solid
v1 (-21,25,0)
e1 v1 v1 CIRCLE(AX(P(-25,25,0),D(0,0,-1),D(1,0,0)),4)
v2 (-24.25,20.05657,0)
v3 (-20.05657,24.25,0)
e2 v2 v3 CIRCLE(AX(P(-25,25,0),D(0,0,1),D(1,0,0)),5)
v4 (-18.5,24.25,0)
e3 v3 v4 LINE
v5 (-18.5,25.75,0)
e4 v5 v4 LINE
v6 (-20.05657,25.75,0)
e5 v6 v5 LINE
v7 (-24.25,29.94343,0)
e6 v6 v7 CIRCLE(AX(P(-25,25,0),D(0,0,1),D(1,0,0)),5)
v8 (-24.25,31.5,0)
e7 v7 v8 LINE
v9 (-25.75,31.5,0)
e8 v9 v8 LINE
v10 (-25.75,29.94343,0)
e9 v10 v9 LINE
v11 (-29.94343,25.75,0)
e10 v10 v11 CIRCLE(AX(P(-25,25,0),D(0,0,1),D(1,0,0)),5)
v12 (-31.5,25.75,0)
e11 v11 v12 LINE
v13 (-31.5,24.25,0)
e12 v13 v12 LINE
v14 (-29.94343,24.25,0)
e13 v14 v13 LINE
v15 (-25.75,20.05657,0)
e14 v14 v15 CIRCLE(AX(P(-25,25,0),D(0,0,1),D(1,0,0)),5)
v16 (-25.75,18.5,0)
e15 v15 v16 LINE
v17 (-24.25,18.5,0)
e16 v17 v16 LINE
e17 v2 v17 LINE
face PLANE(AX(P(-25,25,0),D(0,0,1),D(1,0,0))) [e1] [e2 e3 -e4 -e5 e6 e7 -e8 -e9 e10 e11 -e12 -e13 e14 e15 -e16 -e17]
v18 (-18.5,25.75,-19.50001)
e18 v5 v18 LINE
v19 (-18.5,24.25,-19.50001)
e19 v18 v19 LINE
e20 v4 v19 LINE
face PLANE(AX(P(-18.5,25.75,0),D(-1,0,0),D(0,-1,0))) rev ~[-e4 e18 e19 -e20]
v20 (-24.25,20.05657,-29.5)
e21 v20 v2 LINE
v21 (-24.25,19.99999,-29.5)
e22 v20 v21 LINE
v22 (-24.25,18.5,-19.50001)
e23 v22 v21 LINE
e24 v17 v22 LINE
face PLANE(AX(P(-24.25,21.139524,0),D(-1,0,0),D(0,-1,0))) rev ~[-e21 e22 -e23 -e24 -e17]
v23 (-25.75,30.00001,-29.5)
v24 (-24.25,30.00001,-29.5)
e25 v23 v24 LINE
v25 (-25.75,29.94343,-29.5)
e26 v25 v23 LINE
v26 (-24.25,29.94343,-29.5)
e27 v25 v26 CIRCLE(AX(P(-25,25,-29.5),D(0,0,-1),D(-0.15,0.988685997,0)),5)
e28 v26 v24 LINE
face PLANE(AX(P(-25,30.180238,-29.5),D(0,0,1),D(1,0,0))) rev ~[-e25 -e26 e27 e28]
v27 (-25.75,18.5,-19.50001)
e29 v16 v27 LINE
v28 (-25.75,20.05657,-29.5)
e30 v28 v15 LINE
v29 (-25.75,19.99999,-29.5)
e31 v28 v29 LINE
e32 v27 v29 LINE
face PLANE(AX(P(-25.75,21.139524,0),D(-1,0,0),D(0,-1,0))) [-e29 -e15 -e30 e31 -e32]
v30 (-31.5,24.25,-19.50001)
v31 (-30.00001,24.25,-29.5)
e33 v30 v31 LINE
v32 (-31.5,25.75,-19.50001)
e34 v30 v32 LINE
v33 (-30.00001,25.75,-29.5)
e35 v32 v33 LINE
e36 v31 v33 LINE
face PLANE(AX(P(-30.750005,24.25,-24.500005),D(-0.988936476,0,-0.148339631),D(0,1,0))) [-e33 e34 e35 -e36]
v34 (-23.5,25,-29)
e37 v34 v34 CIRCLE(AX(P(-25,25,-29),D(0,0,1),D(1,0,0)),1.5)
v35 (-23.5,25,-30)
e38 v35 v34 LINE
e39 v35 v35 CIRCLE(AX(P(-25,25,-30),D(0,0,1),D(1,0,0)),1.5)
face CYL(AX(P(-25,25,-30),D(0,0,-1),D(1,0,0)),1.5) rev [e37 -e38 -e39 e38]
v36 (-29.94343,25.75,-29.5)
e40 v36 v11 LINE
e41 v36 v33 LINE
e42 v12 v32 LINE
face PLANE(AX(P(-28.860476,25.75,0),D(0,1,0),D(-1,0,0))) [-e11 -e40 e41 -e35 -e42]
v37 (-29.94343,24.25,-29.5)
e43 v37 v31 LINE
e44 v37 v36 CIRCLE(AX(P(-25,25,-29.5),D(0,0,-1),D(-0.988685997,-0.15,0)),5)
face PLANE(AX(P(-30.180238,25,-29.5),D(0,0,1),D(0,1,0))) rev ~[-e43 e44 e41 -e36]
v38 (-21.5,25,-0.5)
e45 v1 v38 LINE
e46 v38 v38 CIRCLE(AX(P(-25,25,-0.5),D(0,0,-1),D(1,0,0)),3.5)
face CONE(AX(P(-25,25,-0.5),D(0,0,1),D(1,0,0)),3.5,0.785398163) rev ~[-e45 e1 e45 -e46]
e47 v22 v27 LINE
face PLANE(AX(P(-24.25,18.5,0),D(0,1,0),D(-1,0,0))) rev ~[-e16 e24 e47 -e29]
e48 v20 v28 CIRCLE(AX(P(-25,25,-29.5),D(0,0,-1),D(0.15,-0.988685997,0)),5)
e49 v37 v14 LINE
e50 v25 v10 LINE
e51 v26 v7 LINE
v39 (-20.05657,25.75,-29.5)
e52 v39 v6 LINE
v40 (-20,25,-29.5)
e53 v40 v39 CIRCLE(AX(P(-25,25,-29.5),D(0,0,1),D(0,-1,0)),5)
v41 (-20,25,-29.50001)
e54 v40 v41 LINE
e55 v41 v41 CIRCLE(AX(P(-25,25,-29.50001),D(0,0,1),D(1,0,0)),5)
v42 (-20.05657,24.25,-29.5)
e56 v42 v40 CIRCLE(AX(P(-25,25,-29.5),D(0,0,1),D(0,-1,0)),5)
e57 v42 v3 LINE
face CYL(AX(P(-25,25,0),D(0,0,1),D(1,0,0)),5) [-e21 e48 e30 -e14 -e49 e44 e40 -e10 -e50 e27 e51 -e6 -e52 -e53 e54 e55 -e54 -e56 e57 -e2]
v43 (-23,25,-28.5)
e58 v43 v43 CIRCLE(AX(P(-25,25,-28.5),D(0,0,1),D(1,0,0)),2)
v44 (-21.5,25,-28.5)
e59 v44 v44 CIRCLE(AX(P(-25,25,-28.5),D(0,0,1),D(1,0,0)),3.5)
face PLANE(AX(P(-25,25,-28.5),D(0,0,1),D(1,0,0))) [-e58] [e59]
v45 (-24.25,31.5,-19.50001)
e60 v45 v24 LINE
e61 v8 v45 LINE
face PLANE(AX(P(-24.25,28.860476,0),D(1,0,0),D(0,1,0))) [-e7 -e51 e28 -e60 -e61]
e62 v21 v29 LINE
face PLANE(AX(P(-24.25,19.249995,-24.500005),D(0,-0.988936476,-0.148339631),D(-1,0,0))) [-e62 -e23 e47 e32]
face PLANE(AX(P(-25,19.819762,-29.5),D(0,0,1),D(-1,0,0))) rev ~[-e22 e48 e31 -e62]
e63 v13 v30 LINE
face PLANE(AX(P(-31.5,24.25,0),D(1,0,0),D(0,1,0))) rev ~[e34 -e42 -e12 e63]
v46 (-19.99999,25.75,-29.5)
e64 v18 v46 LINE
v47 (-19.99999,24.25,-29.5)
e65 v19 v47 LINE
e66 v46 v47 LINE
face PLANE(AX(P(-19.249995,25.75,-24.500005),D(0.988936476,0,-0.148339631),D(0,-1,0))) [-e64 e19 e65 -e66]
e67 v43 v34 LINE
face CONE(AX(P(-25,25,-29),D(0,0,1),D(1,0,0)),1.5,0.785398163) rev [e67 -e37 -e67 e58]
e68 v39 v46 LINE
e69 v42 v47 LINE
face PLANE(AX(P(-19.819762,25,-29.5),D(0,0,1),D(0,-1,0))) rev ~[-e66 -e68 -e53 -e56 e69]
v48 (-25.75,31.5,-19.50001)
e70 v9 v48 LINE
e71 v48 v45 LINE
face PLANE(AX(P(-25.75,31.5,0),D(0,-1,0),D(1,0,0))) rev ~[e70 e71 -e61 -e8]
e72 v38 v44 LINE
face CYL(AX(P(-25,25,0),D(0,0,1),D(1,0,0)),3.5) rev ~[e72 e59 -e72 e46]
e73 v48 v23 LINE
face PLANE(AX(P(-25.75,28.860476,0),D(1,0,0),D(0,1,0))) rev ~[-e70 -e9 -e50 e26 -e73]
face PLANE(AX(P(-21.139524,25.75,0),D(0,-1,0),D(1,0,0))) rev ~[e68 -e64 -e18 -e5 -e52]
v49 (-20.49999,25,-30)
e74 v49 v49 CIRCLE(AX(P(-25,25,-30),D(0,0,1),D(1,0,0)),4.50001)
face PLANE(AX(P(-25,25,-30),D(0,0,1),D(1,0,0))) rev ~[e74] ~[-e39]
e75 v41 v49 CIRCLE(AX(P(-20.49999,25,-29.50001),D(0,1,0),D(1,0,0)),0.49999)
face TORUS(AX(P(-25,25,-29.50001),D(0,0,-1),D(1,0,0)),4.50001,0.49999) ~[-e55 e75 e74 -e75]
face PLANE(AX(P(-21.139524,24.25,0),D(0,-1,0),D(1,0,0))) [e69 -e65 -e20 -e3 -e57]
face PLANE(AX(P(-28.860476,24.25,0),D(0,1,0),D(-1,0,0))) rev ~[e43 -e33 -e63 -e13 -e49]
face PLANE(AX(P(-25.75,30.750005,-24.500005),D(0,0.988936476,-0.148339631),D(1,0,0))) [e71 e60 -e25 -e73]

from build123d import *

# Parameters (mm, degrees)
F1_R        = 5
F1_R_2      = 3.5
F2_DEPTH    = 30
F4_W        = 1.5
F4_H        = 2.639524132
F5_DEPTH    = 29.5
F6_COUNT    = 4
F8_R        = 3.5
F8_R_2      = 1.5
F9_DEPTH    = 1.5
F10_SIZE2   = 1.49999
F10_SIZE    = 9.99999
F10_2_SIZE2 = 1.49999
F10_2_SIZE  = 9.99999
F10_3_SIZE2 = 1.49999
F10_3_SIZE  = 9.99999
F10_4_SIZE2 = 1.49999
F10_4_SIZE  = 9.99999
F11_SIZE    = 0.5
F12_R       = 0.49999


# Not quite as in the source:
# - a fillet or chamfer is up to 0.001 mm smaller than in the source, because OpenCascade refuses the exact size


with BuildPart() as f2:
    # F1 (on offset) → F2 (new body)
    with BuildSketch(Plane.XY):
        with Locations((-25, 25)):
            Circle(F1_R)
        with Locations((-25, 25)):
            Circle(F1_R_2, mode=Mode.SUBTRACT)
    extrude(amount=-F2_DEPTH)

    # F4 (on offset) → F5 (join)
    with BuildSketch(Plane.XY):
        with Locations((-25, 30.180237934)):
            Rectangle(F4_W, F4_H)
    extrude(amount=-F5_DEPTH)

    # F6: F2 ×4 about axis
    f6_axis = Axis((-25, 25, 0), (0, 0, 1))


with BuildPart() as f2_1:
    add(f2.part)
    for i in range(1, F6_COUNT):
        add(f2.part.rotate(f6_axis, i * 360 / F6_COUNT))

    # F8 (on offset) → F9 (join)
    with BuildSketch(Plane.XY.offset(-30)):
        with Locations((-25, 25)):
            Circle(F8_R)
        with Locations((-25, 25)):
            Circle(F8_R_2, mode=Mode.SUBTRACT)
    extrude(amount=F9_DEPTH)

    # F10 (size 10 and 1.5 in the source; OpenCascade refuses exactly that, so slightly less here)
    f10_edges = [f2_1.edges().sort_by_distance(p)[0] for p in [
        (-25, 18.5, -29.5),
    ]]
    f10_side = f2_1.faces().sort_by_distance((-25, 18.5, -14.75))[0]
    chamfer(f10_edges, length=F10_SIZE, length2=F10_SIZE2, reference=f10_side)

    # F10#2 (size 10 and 1.5 in the source; OpenCascade refuses exactly that, so slightly less here)
    f10_2_edges = [f2_1.edges().sort_by_distance(p)[0] for p in [
        (-18.5, 25, -29.5),
    ]]
    f10_2_side = f2_1.faces().sort_by_distance((-18.5, 25, -14.75))[0]
    chamfer(f10_2_edges, length=F10_2_SIZE, length2=F10_2_SIZE2, reference=f10_2_side)

    # F10#3 (size 10 and 1.5 in the source; OpenCascade refuses exactly that, so slightly less here)
    f10_3_edges = [f2_1.edges().sort_by_distance(p)[0] for p in [
        (-25, 31.5, -29.5),
    ]]
    f10_3_side = f2_1.faces().sort_by_distance((-25, 31.5, -14.75))[0]
    chamfer(f10_3_edges, length=F10_3_SIZE, length2=F10_3_SIZE2, reference=f10_3_side)

    # F10#4 (size 10 and 1.5 in the source; OpenCascade refuses exactly that, so slightly less here)
    f10_4_edges = [f2_1.edges().sort_by_distance(p)[0] for p in [
        (-31.5, 25, -29.5),
    ]]
    f10_4_side = f2_1.faces().sort_by_distance((-31.5, 25, -14.75))[0]
    chamfer(f10_4_edges, length=F10_4_SIZE, length2=F10_4_SIZE2, reference=f10_4_side)

    # F11
    f11_edges = [f2_1.edges().sort_by_distance(p)[0] for p in [
        (-28.5, 25, 0),
        (-26.5, 25, -28.5),
    ]]
    chamfer(f11_edges, length=F11_SIZE)

    # F12 (radius 0.5 in the source; OpenCascade refuses exactly that, so slightly less here)
    f12_edges = [f2_1.edges().sort_by_distance(p)[0] for p in [
        (-30, 25, -30),
    ]]
    fillet(f12_edges, radius=F12_R)


solid = f2_1.part
